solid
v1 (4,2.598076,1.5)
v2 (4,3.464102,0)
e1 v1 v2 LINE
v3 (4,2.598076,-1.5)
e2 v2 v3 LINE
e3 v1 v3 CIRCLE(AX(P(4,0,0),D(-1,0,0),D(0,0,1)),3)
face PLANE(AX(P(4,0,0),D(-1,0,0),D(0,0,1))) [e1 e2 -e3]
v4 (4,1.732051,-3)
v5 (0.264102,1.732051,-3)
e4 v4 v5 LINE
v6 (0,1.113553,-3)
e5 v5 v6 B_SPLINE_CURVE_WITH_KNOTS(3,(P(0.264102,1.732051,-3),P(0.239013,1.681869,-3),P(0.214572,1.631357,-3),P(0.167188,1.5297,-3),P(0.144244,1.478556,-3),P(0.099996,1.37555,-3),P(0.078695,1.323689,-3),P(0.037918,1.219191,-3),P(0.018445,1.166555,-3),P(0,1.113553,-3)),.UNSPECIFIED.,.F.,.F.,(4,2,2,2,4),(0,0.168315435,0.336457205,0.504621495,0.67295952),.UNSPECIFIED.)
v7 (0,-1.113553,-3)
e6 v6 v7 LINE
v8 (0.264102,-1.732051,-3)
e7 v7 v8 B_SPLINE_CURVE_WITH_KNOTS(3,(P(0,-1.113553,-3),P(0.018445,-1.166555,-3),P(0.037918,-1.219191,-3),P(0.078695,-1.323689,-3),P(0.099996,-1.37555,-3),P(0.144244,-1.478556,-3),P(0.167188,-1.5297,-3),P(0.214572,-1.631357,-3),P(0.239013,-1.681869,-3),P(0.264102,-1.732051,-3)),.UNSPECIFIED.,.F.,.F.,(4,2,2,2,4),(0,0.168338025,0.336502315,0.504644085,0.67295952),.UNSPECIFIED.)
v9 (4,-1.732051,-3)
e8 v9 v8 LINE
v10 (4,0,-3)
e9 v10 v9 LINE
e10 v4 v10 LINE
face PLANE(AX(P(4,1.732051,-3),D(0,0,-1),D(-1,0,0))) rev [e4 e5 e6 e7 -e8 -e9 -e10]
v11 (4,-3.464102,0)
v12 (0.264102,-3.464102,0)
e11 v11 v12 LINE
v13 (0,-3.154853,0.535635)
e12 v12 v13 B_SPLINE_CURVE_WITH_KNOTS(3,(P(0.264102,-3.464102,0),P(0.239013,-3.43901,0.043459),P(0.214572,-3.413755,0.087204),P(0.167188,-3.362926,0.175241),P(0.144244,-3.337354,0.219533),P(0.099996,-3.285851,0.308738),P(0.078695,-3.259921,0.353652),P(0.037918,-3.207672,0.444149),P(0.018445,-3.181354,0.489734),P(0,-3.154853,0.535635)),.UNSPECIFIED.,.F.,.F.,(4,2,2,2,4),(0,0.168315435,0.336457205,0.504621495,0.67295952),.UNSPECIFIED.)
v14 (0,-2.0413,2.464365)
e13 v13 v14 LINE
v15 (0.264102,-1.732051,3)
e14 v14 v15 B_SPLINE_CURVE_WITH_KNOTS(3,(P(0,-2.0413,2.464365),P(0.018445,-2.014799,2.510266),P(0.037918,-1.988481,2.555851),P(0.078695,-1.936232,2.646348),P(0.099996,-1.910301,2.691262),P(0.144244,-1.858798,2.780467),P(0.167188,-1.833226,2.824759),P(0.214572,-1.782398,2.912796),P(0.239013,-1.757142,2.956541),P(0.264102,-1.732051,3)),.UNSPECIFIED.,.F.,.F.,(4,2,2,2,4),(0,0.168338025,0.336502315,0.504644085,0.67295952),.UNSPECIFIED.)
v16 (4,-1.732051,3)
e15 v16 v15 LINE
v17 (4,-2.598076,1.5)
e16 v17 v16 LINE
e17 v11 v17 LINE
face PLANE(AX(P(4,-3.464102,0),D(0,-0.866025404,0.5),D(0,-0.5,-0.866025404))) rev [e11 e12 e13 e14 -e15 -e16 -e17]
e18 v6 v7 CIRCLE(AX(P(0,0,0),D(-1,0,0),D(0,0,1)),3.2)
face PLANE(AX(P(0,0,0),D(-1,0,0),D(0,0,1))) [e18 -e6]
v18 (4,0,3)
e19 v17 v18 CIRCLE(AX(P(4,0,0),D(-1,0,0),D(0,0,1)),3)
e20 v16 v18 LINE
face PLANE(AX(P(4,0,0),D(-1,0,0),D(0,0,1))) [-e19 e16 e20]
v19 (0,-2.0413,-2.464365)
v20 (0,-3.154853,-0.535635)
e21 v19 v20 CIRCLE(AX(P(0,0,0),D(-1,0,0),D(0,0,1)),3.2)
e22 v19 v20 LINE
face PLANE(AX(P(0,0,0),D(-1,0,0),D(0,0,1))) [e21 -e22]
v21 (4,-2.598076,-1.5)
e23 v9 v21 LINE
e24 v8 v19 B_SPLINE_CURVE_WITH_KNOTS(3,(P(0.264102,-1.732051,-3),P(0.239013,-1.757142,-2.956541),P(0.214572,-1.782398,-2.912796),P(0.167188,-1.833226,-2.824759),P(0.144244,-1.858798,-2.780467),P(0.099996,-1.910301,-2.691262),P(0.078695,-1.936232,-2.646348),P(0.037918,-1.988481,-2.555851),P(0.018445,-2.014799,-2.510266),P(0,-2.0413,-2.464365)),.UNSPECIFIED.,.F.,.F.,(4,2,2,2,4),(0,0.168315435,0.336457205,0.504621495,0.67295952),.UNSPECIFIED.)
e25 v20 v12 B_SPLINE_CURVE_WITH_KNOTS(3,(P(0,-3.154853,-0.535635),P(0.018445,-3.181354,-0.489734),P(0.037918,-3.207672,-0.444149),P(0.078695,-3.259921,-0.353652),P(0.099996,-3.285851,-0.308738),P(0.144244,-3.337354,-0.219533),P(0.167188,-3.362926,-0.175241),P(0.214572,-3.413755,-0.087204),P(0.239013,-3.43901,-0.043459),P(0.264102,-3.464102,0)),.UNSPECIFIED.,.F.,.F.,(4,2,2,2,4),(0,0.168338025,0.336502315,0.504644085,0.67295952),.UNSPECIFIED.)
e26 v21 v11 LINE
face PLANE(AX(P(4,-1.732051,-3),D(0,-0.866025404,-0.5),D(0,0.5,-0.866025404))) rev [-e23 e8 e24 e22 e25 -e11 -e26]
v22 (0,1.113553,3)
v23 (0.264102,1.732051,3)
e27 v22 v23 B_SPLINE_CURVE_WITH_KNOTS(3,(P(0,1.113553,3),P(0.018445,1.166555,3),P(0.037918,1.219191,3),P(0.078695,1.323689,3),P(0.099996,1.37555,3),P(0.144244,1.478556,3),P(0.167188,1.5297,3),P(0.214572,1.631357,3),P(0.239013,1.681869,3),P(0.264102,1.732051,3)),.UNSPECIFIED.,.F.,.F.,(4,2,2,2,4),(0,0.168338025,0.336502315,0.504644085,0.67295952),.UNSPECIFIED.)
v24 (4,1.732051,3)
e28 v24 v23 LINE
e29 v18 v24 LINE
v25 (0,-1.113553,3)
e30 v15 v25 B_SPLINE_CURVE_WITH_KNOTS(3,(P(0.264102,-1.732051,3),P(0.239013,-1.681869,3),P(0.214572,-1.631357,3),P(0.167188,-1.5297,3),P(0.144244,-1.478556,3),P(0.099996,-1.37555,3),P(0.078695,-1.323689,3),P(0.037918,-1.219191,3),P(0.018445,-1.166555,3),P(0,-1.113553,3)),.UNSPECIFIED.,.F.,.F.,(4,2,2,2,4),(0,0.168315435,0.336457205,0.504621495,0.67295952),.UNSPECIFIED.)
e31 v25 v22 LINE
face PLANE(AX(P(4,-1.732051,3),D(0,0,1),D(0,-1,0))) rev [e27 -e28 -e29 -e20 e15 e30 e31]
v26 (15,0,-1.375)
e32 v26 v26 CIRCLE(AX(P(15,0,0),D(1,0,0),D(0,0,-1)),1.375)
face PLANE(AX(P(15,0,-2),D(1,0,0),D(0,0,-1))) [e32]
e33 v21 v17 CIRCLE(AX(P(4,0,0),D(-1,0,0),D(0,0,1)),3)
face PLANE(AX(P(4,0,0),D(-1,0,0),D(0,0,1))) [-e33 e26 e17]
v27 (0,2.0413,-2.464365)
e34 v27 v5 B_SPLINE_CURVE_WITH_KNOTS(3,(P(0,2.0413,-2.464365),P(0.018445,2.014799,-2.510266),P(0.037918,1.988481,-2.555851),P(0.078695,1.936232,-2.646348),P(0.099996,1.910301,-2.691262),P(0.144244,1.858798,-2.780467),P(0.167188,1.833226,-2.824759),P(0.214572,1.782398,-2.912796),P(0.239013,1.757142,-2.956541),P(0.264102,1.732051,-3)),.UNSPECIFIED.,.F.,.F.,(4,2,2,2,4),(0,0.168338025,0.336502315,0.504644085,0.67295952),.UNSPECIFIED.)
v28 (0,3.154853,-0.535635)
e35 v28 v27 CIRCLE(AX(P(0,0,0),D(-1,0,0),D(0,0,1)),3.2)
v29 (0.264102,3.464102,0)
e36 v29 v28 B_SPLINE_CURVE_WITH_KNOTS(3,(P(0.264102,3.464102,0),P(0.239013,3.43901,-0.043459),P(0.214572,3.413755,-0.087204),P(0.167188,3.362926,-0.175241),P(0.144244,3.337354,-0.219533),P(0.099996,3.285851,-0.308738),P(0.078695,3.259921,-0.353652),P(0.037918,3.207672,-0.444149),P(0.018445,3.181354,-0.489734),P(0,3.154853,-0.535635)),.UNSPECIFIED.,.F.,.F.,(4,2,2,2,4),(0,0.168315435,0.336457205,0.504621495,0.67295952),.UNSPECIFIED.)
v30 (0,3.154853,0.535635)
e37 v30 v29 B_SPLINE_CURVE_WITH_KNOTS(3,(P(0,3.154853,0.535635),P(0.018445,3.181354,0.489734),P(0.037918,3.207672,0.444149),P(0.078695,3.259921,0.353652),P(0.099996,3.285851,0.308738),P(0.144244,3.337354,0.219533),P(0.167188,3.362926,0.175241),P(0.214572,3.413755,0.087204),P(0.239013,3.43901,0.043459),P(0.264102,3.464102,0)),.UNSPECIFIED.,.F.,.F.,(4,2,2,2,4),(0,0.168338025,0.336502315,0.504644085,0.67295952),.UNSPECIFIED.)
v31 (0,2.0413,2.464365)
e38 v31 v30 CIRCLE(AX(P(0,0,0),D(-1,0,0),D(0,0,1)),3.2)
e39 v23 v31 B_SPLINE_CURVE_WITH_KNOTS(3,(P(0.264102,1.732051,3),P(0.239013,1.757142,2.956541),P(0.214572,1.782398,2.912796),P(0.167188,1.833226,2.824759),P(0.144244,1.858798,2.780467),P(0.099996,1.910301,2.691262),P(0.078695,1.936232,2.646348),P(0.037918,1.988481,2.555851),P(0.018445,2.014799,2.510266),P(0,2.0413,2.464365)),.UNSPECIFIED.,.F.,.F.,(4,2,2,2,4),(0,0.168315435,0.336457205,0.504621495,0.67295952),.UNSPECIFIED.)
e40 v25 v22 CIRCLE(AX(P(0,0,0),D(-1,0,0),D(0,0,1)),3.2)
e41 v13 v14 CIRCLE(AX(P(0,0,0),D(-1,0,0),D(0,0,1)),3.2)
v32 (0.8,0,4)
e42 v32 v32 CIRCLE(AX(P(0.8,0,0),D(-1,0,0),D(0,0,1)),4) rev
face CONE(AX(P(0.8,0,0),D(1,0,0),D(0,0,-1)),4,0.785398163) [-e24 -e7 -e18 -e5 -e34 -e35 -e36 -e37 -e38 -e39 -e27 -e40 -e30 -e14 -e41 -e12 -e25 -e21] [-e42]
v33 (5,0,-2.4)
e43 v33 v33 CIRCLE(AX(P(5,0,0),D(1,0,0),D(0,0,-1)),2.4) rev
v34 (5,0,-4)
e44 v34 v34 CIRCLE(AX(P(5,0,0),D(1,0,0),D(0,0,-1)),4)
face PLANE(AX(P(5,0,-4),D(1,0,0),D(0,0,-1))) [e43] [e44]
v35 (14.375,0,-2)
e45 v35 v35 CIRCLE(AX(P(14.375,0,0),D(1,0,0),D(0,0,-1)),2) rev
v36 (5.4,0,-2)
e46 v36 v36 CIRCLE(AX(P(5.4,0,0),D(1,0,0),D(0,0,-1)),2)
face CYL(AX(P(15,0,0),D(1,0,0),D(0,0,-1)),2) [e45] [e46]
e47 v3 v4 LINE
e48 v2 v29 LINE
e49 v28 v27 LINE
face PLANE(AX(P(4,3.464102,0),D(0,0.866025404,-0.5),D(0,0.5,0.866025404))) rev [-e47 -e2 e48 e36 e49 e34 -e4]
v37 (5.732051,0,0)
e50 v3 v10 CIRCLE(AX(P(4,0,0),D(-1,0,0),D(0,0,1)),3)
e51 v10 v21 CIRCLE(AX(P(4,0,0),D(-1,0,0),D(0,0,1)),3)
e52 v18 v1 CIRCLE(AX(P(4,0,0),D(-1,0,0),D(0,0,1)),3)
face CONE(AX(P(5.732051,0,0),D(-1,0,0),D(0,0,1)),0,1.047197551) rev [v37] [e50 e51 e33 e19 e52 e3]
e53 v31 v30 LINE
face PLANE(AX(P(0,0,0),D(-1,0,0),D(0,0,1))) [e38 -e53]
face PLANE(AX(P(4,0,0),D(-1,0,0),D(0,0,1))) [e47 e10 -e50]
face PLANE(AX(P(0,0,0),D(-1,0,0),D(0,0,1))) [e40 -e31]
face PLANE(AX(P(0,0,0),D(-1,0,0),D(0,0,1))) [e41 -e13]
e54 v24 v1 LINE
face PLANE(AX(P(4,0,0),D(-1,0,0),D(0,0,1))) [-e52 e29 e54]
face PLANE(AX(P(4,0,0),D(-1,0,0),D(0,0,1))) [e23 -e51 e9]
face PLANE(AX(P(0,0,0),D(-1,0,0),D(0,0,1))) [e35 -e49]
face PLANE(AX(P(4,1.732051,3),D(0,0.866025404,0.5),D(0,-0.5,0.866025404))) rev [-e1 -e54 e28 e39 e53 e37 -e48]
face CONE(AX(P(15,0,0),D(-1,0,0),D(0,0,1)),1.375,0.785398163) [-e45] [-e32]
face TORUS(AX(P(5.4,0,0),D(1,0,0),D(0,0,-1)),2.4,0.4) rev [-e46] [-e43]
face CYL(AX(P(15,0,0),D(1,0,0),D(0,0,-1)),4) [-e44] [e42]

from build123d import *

# Parameters (mm, degrees)
CHAMFER1_SIZE      = 0.625
CUT_EXTRUDE1_DEPTH = 4
CHAMFER2_SIZE      = 0.8
FILLET1_R          = 0.4


with BuildPart() as part:
    # Sketch1 → Revolve1 (revolve)
    with BuildSketch(Plane(origin=(0, 0, 0), x_dir=(1, 0, 0), z_dir=(0, 1, 0))):
        Polygon((0, 0), (0, 4), (5, 4), (5, 2), (15, 2), (15, 0), align=None)
    revolve(axis=Axis((15, 0, 0), (-1, 0, 0)))

    # Chamfer1
    chamfer1_edges = [part.edges().sort_by_distance(p)[0] for p in [
        (15, 0, 2),
    ]]
    chamfer(chamfer1_edges, length=CHAMFER1_SIZE)

    # Sketch3 → Cut-Revolve1 (revolve, cut)
    with BuildSketch(Plane(origin=(0, 0, 0), x_dir=(1, 0, 0), z_dir=(0, 1, 0)), mode=Mode.PRIVATE) as cut_revolve1_sk:
        Polygon((0, 0), (5.732050808, 0), (4, 3), (0, 3), align=None)
    revolve(cut_revolve1_sk.sketch.rotate(Axis((0, 0, 0), (1, 0, 0)), 180), axis=Axis((0, 0, 0), (1, 0, 0)), mode=Mode.SUBTRACT)

    # Sketch2 → Cut-Extrude1 (cut)
    with BuildSketch(Plane.ZY):
        Polygon((0, 3.464101615), (-3, 1.732050808), (-3, -1.732050808), (0, -3.464101615), (3, -1.732050808), (3, 1.732050808), align=None)
    extrude(amount=-CUT_EXTRUDE1_DEPTH, mode=Mode.SUBTRACT)

    # Chamfer2
    # the kernel refuses this chamfer: 0.8 mm, written as the material it takes off along each edge
    with BuildSketch(Plane(origin=(0, 0, 0), x_dir=(0, 0, -1), z_dir=(0, 1, 0))) as chamfer2_piece_1:
        Polygon((4, -CHAMFER2_SIZE), (4 - CHAMFER2_SIZE, 0), (4, 0), align=None)
    revolve(axis=Axis((0, 0, 0), (-1, 0, 0)), mode=Mode.SUBTRACT)

    # Fillet1
    fillet1_edges = [part.edges().sort_by_distance(p)[0] for p in [
        (5, 0, 2),
    ]]
    fillet(fillet1_edges, radius=FILLET1_R)


solid = part.part
